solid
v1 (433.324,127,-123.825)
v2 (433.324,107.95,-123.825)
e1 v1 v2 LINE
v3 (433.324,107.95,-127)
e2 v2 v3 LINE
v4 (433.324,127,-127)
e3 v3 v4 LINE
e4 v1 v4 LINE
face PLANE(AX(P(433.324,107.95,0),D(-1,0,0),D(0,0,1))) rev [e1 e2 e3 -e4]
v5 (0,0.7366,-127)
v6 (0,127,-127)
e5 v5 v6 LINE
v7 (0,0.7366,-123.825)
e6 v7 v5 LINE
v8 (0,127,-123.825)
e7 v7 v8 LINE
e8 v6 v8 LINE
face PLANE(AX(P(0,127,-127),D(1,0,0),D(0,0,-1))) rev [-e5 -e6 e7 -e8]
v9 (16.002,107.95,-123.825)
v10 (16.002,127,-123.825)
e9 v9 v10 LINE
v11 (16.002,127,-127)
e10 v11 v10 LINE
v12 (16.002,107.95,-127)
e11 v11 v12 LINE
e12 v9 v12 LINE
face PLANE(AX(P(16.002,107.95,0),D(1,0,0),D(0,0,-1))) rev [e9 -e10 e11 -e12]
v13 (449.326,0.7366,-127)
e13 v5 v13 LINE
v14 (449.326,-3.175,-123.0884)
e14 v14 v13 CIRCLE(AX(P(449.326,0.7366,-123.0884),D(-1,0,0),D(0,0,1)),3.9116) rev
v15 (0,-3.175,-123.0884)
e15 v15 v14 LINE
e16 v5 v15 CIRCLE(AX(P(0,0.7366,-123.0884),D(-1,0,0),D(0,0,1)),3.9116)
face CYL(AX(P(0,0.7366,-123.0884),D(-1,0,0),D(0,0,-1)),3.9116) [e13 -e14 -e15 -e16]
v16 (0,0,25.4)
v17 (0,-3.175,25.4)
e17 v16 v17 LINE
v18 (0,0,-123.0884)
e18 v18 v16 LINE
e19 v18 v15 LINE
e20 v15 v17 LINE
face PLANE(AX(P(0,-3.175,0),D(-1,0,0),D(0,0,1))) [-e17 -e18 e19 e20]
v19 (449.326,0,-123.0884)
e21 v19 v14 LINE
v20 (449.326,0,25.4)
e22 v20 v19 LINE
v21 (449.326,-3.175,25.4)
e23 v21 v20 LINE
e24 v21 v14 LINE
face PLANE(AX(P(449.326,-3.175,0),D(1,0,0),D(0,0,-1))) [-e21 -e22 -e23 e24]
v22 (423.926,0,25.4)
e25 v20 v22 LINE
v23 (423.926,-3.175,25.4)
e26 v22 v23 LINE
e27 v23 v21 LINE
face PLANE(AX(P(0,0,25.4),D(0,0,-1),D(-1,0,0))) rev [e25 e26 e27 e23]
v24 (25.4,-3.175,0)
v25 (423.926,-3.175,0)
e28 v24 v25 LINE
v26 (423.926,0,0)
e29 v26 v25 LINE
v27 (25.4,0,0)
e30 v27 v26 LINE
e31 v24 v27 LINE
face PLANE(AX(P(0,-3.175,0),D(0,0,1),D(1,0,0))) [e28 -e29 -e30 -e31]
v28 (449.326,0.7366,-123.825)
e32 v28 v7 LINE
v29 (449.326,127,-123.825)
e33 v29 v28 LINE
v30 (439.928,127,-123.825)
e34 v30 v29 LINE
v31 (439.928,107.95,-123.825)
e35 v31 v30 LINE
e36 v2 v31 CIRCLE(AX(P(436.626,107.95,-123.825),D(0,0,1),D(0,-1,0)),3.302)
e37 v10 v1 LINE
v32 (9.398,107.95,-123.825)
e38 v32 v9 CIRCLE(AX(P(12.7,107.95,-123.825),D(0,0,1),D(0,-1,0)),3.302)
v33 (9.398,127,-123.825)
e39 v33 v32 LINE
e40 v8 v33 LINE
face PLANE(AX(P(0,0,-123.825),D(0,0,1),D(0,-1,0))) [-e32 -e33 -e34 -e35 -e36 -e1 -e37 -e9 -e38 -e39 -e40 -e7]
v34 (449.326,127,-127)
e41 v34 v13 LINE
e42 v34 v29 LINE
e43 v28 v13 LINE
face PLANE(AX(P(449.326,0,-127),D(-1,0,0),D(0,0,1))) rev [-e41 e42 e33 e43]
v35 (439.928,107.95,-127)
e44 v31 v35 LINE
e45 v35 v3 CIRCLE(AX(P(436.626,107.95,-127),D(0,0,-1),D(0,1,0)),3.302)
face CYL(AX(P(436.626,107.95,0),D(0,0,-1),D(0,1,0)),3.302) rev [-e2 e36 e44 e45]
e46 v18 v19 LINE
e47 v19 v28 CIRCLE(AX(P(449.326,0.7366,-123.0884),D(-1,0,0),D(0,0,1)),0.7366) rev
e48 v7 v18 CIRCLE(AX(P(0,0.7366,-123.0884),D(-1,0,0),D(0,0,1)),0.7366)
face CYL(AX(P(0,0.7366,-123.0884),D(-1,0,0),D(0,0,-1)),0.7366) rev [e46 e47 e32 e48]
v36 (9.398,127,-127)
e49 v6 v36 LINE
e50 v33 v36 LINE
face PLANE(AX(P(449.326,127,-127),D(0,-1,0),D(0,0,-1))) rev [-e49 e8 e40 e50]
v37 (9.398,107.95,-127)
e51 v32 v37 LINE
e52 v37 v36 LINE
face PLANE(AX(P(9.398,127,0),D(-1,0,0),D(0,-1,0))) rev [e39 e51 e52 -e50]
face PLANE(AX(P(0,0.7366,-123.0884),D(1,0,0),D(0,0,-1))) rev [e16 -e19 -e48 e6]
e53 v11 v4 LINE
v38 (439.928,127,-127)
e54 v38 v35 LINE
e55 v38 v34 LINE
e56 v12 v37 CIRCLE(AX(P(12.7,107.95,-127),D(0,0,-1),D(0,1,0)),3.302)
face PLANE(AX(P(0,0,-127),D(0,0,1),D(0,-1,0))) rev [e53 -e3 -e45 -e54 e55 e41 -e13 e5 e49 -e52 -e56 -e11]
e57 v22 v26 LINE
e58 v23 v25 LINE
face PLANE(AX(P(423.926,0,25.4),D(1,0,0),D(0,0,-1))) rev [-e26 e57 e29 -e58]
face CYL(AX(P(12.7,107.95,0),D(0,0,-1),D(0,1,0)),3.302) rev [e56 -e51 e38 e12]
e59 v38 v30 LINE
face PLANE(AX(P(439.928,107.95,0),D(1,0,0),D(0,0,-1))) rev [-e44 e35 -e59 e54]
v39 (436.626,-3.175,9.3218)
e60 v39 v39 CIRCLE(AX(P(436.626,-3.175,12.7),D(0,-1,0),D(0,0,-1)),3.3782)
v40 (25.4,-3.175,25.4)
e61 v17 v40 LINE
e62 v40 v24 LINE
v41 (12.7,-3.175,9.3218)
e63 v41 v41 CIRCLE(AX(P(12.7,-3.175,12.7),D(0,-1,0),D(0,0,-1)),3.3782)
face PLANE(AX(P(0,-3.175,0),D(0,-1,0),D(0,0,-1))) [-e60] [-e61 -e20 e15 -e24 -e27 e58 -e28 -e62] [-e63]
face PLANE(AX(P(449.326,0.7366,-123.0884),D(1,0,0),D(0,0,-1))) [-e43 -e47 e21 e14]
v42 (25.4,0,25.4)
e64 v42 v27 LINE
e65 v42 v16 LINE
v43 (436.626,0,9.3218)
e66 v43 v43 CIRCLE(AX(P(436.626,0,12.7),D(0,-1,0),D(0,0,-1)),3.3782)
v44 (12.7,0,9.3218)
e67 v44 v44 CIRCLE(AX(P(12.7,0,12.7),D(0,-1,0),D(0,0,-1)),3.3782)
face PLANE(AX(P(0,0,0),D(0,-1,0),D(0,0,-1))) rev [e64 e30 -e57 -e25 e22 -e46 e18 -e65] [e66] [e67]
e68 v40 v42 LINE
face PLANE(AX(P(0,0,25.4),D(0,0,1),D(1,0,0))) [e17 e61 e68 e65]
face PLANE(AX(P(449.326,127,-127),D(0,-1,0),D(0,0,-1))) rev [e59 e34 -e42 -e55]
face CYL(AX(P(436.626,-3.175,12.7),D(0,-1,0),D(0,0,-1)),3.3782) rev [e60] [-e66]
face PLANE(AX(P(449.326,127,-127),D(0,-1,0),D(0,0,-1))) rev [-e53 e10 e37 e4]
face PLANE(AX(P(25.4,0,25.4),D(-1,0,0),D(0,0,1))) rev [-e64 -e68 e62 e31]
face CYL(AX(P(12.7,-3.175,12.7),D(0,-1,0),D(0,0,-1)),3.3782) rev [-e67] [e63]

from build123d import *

# Parameters (mm, degrees)
SKETCH1_W                    = 449.326
SKETCH1_H                    = 127
BASE_FLANGE1_DEPTH           = 3.175
EDGE_FLANGE1_STRIP_W         = 14.1732
EDGE_FLANGE1_STRIP_H         = 3.175
EDGE_FLANGE1_STRIP_CUT_DEPTH = 449.326
EDGE_FLANGE1_DEPTH           = 449.326
CUT_EXTRUDE1_DEPTH           = 484.892399482
SKETCH10_W                   = 25.4
SKETCH10_H                   = 3.175
BOSS_EXTRUDE1_DEPTH          = 25.4
F_1_4_CLEARANCE_HOLE1_D      = 6.7564
F_1_4_CLEARANCE_HOLE1_DEPTH  = 25.4
F_1_4_CLEARANCE_HOLE1_TIP    = 2.029827343


# Sheet-metal steps are written as plain solids
with BuildPart() as part:
    # Sketch1 → Base-Flange1 (new body)
    with BuildSketch(Plane(origin=(0, 0, 0), x_dir=(1, 0, 0), z_dir=(0, 1, 0))):
        with Locations((224.663, 63.5)):
            Rectangle(SKETCH1_W, SKETCH1_H)
    extrude(amount=-BASE_FLANGE1_DEPTH)

    # Edge-Flange1 strip (across the edge) → Edge-Flange1 strip cut (cut)
    with BuildSketch(Plane(origin=(449.326, 0, -127), x_dir=(0, 0, 1), z_dir=(-1, 0, 0))):
        with Locations((-3.175, -1.5875)):
            Rectangle(EDGE_FLANGE1_STRIP_W, EDGE_FLANGE1_STRIP_H)
    extrude(amount=EDGE_FLANGE1_STRIP_CUT_DEPTH, mode=Mode.SUBTRACT)

    # Edge-Flange1 section (across the edge) → Edge-Flange1 (add)
    with BuildSketch(Plane(origin=(449.326, 0, -127), x_dir=(0, 0, 1), z_dir=(-1, 0, 0))):
        with BuildLine():
            Line((0, 0.7366), (0, 127))
            Line((0, 127), (3.175, 127))
            Line((3.175, 127), (3.175, 0.7366))
            ThreePointArc((3.175, 0.7366), (3.390745145, 0.215745145), (3.9116, 0))
            Line((3.9116, 0), (3.9116, -3.175))
            ThreePointArc((3.9116, -3.175), (1.145681115, -2.029318885), (0, 0.7366))
        make_face()
    extrude(amount=EDGE_FLANGE1_DEPTH)

    # Sketch9 → Cut-Extrude1 (cut, through all)
    with BuildSketch(Plane(origin=(0, 0, -127), x_dir=(-1, 0, 0), z_dir=(0, 0, -1))):
        with BuildLine():
            Line((-433.324, 107.95), (-433.324, 127))
            Line((-433.324, 127), (-439.928, 127))
            Line((-439.928, 127), (-439.928, 107.95))
            ThreePointArc((-439.928, 107.95), (-436.626, 104.648), (-433.324, 107.95))
        make_face()
        with BuildLine():
            Line((-16.002, 107.95), (-16.002, 127))
            Line((-16.002, 127), (-9.398, 127))
            Line((-9.398, 127), (-9.398, 107.95))
            ThreePointArc((-9.398, 107.95), (-12.7, 104.648), (-16.002, 107.95))
        make_face()
    extrude(amount=-CUT_EXTRUDE1_DEPTH, mode=Mode.SUBTRACT)

    # Sketch10 → Boss-Extrude1 (add)
    with BuildSketch(Plane.XY):
        with Locations((436.626, -1.5875)):
            Rectangle(SKETCH10_W, SKETCH10_H)
        with Locations((12.7, -1.5875)):
            Rectangle(SKETCH10_W, SKETCH10_H)
    extrude(amount=BOSS_EXTRUDE1_DEPTH)

    # 1/4 Clearance Hole1
    with Locations(Plane(origin=(12.7, -3.175, 12.7), x_dir=(0, 0, -1), z_dir=(0, -1, 0))):
        with Locations((0, 0), (0, 423.926)):
            Hole(F_1_4_CLEARANCE_HOLE1_D / 2, depth=F_1_4_CLEARANCE_HOLE1_DEPTH)
            with Locations((0, 0, -(F_1_4_CLEARANCE_HOLE1_DEPTH + F_1_4_CLEARANCE_HOLE1_TIP / 2))):  # 118° drill point
                Cone(0, F_1_4_CLEARANCE_HOLE1_D / 2, F_1_4_CLEARANCE_HOLE1_TIP, mode=Mode.SUBTRACT)


solid = part.part
